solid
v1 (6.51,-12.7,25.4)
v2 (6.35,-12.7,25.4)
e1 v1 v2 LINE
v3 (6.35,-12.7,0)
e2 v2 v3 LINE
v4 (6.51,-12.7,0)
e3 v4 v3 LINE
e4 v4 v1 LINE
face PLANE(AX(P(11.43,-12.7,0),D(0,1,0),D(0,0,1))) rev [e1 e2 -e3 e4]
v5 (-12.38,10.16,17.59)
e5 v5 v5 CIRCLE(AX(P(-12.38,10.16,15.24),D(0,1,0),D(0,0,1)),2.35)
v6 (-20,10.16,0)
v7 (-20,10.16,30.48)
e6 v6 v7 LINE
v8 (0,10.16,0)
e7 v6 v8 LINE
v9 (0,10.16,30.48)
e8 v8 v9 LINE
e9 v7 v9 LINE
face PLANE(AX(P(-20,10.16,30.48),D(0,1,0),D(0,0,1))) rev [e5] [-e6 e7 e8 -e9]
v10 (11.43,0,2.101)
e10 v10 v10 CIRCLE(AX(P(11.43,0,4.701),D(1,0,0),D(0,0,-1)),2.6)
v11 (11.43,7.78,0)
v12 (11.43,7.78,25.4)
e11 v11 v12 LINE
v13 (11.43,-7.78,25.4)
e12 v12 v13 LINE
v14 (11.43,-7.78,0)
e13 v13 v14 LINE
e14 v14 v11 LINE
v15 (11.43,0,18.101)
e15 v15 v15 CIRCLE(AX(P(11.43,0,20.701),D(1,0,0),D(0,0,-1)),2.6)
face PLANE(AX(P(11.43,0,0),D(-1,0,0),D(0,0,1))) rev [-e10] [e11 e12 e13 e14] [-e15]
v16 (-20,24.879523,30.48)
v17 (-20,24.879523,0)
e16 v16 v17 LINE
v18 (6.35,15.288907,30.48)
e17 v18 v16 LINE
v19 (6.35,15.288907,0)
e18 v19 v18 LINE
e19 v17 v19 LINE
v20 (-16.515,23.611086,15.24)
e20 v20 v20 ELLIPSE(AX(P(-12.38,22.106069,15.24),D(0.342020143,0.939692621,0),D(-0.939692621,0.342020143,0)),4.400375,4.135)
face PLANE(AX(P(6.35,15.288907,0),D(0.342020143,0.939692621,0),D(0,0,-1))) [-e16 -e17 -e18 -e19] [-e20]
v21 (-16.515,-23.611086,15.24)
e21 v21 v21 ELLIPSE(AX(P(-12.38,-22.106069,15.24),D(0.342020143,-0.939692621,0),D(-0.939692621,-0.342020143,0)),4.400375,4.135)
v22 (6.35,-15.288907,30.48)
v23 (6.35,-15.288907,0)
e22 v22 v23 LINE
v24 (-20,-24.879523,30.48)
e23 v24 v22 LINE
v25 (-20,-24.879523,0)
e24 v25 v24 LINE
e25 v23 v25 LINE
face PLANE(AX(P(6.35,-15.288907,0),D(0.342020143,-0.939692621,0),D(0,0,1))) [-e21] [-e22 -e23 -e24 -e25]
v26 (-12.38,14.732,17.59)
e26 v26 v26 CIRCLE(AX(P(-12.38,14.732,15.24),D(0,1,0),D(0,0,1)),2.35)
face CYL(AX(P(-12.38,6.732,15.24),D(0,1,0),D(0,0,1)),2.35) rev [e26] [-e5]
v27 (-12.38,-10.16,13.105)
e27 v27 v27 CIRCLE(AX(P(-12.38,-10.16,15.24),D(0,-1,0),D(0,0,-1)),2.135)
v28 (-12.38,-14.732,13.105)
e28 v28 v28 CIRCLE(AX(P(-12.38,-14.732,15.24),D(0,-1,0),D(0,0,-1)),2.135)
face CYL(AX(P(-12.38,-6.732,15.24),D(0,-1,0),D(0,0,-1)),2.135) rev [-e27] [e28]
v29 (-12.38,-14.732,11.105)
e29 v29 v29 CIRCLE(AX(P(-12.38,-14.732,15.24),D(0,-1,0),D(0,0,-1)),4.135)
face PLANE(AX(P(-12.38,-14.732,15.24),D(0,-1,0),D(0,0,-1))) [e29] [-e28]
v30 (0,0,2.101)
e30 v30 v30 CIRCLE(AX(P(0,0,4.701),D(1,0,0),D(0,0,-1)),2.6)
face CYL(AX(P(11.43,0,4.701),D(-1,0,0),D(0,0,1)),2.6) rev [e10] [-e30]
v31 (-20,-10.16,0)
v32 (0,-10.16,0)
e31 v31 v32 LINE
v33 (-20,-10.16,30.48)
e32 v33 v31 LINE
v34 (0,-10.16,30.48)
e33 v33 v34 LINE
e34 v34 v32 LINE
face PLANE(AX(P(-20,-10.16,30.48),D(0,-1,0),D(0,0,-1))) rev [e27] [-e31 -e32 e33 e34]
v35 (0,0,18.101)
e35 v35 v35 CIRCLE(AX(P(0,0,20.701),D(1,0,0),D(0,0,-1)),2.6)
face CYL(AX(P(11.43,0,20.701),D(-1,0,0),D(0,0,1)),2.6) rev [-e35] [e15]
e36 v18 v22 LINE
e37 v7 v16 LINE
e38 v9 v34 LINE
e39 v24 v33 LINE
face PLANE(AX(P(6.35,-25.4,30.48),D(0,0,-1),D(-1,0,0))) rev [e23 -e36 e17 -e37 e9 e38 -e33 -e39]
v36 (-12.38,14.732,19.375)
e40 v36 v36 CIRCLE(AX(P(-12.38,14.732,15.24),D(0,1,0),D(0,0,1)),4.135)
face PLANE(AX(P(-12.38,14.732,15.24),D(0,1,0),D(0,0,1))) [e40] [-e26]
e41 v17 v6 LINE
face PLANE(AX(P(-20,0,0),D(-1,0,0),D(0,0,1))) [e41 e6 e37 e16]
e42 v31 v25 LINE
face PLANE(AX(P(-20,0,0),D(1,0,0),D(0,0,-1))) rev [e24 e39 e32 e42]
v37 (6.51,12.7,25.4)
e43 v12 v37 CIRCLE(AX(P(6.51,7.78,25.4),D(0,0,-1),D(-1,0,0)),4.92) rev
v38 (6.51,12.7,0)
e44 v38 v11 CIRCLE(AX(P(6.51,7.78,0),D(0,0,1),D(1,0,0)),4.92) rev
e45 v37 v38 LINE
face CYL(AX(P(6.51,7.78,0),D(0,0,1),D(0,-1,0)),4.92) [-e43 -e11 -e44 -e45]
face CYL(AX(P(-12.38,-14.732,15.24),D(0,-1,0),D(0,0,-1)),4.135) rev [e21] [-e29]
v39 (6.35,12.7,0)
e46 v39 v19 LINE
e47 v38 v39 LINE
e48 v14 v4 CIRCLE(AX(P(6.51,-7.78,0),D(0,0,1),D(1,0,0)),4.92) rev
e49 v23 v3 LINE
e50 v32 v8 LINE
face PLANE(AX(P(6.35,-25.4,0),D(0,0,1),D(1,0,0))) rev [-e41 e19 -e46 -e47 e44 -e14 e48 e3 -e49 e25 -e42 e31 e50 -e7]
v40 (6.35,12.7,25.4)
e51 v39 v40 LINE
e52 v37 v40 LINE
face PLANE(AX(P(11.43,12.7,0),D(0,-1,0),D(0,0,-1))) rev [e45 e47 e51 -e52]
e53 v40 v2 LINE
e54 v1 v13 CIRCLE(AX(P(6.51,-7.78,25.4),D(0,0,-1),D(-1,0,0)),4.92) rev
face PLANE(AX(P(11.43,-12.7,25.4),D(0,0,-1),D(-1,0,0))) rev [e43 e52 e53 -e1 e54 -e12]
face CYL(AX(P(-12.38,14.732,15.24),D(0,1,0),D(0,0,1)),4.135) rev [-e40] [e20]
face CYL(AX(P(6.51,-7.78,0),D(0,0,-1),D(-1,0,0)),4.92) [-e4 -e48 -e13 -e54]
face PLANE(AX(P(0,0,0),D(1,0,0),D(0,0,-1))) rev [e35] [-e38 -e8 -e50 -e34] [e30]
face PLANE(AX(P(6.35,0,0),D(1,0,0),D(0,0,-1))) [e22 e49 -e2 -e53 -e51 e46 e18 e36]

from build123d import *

# Parameters (mm, degrees)
SKETCH3_W           = 50.8
SKETCH3_H           = 30.48
BOSS_EXTRUDE1_DEPTH = 6.35
SKETCH4_W           = 15.24
SKETCH4_H           = 30.48
BOSS_EXTRUDE2_DEPTH = 20
SKETCH5_R           = 4.135
CUT_EXTRUDE1_DEPTH  = 10.668
SKETCH6_R           = 2.35
CUT_EXTRUDE2_DEPTH  = 8
CUT_EXTRUDE3_START  = -10.668
SKETCH7_R           = 4.135
CUT_EXTRUDE3_DEPTH  = 10.668
SKETCH8_R           = 2.135
CUT_EXTRUDE4_DEPTH  = 8
SKETCH10_W          = 25.4
SKETCH10_H          = 25.4
SKETCH10_R          = 2.6
BOSS_EXTRUDE4_DEPTH = 5.08
CHAMFER1_SIZE       = 10.111093108
CHAMFER1_SIZE_2     = 27.78
FILLET2_R           = 4.92
SKETCH12_R          = 2.6
CUT_EXTRUDE6_DEPTH  = 48.353389985
SKETCH13_R          = 2.6
CUT_EXTRUDE7_DEPTH  = 48.353389985


with BuildPart() as part:
    # Sketch3 → Boss-Extrude1 (new body)
    with BuildSketch(Plane.YZ):
        with Locations((0, 15.24)):
            Rectangle(SKETCH3_W, SKETCH3_H)
    extrude(amount=BOSS_EXTRUDE1_DEPTH)

    # Sketch4 → Boss-Extrude2 (add)
    with BuildSketch(Plane(origin=(0, 0, 0), x_dir=(0, -1, 0), z_dir=(-1, 0, 0))):
        with Locations((-17.78, 15.24)):
            Rectangle(SKETCH4_W, SKETCH4_H)
        with Locations((17.78, 15.24)):
            Rectangle(SKETCH4_W, SKETCH4_H)
    extrude(amount=BOSS_EXTRUDE2_DEPTH)

    # Sketch5 → Cut-Extrude1 (cut)
    with BuildSketch(Plane(origin=(0, 25.4, 0), x_dir=(-1, 0, 0), z_dir=(0, 1, 0))):
        with Locations(Location((12.38, 15.24, 0), (0, 0, 90))):
            Circle(SKETCH5_R)
    extrude(amount=-CUT_EXTRUDE1_DEPTH, mode=Mode.SUBTRACT)

    # Sketch6 → Cut-Extrude2 (cut)
    with BuildSketch(Plane(origin=(0, 14.732, 0), x_dir=(-1, 0, 0), z_dir=(0, 1, 0))):
        with Locations(Location((12.38, 15.24, 0), (0, 0, 90))):
            Circle(SKETCH6_R)
    extrude(amount=-CUT_EXTRUDE2_DEPTH, mode=Mode.SUBTRACT)

    # Sketch7 → Cut-Extrude3 (cut)
    with BuildSketch(Plane.XZ.offset(25.4).offset(CUT_EXTRUDE3_START)):
        with Locations(Location((-12.38, 15.24, 0), (0, 0, 90))):
            Circle(SKETCH7_R)
    extrude(amount=CUT_EXTRUDE3_DEPTH, mode=Mode.SUBTRACT)

    # Sketch8 → Cut-Extrude4 (cut)
    with BuildSketch(Plane.XZ.offset(14.732)):
        with Locations(Location((-12.38, 15.24, 0), (0, 0, 270))):
            Circle(SKETCH8_R)
    extrude(amount=-CUT_EXTRUDE4_DEPTH, mode=Mode.SUBTRACT)

    # Sketch10 → Boss-Extrude4 (add)
    with BuildSketch(Plane.YZ.offset(6.35)):
        with Locations((0, 12.7)):
            Rectangle(SKETCH10_W, SKETCH10_H)
        with Locations(Location((0, 20.701, 0), (0, 0, 270))):
            Circle(SKETCH10_R, mode=Mode.SUBTRACT)
        with Locations(Location((0, 4.701, 0), (0, 0, 270))):
            Circle(SKETCH10_R, mode=Mode.SUBTRACT)
    extrude(amount=BOSS_EXTRUDE4_DEPTH)

    # Chamfer1
    # the kernel refuses this chamfer: 27.78, 10.111093108 mm, written as the material it takes off along each edge
    with BuildSketch(Plane(origin=(6.35, 25.4, 102.54672967), x_dir=(0.09904090225204921, -0.9950833631817487, 0), z_dir=(0, 0, -1)), Plane(origin=(6.35, -25.4, -72.06672967), x_dir=(0.09904090225204921, 0.9950833631817487, 0), z_dir=(0, 0, 1))) as chamfer1_piece_1:
        Polygon((CHAMFER1_SIZE * 0.995083363173, CHAMFER1_SIZE * 0.0990409022512), (-CHAMFER1_SIZE_2 * 0.099040902252, CHAMFER1_SIZE_2 * 0.995083363182), (0, 0), align=None)
    extrude(amount=174.613459341, mode=Mode.SUBTRACT)

    # Fillet2
    fillet2_edges = [part.edges().sort_by_distance(p)[0] for p in [
        (11.43, -12.7, 12.7),
        (11.43, 12.7, 12.7),
    ]]
    fillet(fillet2_edges, radius=FILLET2_R)

    # Sketch12 → Cut-Extrude6 (cut, through all)
    with BuildSketch(Plane.YZ.offset(6.35)):
        with Locations(Location((0, 20.701, 0), (0, 0, 270))):
            Circle(SKETCH12_R)
    extrude(amount=-CUT_EXTRUDE6_DEPTH, mode=Mode.SUBTRACT)

    # Sketch13 → Cut-Extrude7 (cut, through all)
    with BuildSketch(Plane.YZ.offset(6.35)):
        with Locations(Location((0, 4.701, 0), (0, 0, 270))):
            Circle(SKETCH13_R)
    extrude(amount=-CUT_EXTRUDE7_DEPTH, mode=Mode.SUBTRACT)


solid = part.part
